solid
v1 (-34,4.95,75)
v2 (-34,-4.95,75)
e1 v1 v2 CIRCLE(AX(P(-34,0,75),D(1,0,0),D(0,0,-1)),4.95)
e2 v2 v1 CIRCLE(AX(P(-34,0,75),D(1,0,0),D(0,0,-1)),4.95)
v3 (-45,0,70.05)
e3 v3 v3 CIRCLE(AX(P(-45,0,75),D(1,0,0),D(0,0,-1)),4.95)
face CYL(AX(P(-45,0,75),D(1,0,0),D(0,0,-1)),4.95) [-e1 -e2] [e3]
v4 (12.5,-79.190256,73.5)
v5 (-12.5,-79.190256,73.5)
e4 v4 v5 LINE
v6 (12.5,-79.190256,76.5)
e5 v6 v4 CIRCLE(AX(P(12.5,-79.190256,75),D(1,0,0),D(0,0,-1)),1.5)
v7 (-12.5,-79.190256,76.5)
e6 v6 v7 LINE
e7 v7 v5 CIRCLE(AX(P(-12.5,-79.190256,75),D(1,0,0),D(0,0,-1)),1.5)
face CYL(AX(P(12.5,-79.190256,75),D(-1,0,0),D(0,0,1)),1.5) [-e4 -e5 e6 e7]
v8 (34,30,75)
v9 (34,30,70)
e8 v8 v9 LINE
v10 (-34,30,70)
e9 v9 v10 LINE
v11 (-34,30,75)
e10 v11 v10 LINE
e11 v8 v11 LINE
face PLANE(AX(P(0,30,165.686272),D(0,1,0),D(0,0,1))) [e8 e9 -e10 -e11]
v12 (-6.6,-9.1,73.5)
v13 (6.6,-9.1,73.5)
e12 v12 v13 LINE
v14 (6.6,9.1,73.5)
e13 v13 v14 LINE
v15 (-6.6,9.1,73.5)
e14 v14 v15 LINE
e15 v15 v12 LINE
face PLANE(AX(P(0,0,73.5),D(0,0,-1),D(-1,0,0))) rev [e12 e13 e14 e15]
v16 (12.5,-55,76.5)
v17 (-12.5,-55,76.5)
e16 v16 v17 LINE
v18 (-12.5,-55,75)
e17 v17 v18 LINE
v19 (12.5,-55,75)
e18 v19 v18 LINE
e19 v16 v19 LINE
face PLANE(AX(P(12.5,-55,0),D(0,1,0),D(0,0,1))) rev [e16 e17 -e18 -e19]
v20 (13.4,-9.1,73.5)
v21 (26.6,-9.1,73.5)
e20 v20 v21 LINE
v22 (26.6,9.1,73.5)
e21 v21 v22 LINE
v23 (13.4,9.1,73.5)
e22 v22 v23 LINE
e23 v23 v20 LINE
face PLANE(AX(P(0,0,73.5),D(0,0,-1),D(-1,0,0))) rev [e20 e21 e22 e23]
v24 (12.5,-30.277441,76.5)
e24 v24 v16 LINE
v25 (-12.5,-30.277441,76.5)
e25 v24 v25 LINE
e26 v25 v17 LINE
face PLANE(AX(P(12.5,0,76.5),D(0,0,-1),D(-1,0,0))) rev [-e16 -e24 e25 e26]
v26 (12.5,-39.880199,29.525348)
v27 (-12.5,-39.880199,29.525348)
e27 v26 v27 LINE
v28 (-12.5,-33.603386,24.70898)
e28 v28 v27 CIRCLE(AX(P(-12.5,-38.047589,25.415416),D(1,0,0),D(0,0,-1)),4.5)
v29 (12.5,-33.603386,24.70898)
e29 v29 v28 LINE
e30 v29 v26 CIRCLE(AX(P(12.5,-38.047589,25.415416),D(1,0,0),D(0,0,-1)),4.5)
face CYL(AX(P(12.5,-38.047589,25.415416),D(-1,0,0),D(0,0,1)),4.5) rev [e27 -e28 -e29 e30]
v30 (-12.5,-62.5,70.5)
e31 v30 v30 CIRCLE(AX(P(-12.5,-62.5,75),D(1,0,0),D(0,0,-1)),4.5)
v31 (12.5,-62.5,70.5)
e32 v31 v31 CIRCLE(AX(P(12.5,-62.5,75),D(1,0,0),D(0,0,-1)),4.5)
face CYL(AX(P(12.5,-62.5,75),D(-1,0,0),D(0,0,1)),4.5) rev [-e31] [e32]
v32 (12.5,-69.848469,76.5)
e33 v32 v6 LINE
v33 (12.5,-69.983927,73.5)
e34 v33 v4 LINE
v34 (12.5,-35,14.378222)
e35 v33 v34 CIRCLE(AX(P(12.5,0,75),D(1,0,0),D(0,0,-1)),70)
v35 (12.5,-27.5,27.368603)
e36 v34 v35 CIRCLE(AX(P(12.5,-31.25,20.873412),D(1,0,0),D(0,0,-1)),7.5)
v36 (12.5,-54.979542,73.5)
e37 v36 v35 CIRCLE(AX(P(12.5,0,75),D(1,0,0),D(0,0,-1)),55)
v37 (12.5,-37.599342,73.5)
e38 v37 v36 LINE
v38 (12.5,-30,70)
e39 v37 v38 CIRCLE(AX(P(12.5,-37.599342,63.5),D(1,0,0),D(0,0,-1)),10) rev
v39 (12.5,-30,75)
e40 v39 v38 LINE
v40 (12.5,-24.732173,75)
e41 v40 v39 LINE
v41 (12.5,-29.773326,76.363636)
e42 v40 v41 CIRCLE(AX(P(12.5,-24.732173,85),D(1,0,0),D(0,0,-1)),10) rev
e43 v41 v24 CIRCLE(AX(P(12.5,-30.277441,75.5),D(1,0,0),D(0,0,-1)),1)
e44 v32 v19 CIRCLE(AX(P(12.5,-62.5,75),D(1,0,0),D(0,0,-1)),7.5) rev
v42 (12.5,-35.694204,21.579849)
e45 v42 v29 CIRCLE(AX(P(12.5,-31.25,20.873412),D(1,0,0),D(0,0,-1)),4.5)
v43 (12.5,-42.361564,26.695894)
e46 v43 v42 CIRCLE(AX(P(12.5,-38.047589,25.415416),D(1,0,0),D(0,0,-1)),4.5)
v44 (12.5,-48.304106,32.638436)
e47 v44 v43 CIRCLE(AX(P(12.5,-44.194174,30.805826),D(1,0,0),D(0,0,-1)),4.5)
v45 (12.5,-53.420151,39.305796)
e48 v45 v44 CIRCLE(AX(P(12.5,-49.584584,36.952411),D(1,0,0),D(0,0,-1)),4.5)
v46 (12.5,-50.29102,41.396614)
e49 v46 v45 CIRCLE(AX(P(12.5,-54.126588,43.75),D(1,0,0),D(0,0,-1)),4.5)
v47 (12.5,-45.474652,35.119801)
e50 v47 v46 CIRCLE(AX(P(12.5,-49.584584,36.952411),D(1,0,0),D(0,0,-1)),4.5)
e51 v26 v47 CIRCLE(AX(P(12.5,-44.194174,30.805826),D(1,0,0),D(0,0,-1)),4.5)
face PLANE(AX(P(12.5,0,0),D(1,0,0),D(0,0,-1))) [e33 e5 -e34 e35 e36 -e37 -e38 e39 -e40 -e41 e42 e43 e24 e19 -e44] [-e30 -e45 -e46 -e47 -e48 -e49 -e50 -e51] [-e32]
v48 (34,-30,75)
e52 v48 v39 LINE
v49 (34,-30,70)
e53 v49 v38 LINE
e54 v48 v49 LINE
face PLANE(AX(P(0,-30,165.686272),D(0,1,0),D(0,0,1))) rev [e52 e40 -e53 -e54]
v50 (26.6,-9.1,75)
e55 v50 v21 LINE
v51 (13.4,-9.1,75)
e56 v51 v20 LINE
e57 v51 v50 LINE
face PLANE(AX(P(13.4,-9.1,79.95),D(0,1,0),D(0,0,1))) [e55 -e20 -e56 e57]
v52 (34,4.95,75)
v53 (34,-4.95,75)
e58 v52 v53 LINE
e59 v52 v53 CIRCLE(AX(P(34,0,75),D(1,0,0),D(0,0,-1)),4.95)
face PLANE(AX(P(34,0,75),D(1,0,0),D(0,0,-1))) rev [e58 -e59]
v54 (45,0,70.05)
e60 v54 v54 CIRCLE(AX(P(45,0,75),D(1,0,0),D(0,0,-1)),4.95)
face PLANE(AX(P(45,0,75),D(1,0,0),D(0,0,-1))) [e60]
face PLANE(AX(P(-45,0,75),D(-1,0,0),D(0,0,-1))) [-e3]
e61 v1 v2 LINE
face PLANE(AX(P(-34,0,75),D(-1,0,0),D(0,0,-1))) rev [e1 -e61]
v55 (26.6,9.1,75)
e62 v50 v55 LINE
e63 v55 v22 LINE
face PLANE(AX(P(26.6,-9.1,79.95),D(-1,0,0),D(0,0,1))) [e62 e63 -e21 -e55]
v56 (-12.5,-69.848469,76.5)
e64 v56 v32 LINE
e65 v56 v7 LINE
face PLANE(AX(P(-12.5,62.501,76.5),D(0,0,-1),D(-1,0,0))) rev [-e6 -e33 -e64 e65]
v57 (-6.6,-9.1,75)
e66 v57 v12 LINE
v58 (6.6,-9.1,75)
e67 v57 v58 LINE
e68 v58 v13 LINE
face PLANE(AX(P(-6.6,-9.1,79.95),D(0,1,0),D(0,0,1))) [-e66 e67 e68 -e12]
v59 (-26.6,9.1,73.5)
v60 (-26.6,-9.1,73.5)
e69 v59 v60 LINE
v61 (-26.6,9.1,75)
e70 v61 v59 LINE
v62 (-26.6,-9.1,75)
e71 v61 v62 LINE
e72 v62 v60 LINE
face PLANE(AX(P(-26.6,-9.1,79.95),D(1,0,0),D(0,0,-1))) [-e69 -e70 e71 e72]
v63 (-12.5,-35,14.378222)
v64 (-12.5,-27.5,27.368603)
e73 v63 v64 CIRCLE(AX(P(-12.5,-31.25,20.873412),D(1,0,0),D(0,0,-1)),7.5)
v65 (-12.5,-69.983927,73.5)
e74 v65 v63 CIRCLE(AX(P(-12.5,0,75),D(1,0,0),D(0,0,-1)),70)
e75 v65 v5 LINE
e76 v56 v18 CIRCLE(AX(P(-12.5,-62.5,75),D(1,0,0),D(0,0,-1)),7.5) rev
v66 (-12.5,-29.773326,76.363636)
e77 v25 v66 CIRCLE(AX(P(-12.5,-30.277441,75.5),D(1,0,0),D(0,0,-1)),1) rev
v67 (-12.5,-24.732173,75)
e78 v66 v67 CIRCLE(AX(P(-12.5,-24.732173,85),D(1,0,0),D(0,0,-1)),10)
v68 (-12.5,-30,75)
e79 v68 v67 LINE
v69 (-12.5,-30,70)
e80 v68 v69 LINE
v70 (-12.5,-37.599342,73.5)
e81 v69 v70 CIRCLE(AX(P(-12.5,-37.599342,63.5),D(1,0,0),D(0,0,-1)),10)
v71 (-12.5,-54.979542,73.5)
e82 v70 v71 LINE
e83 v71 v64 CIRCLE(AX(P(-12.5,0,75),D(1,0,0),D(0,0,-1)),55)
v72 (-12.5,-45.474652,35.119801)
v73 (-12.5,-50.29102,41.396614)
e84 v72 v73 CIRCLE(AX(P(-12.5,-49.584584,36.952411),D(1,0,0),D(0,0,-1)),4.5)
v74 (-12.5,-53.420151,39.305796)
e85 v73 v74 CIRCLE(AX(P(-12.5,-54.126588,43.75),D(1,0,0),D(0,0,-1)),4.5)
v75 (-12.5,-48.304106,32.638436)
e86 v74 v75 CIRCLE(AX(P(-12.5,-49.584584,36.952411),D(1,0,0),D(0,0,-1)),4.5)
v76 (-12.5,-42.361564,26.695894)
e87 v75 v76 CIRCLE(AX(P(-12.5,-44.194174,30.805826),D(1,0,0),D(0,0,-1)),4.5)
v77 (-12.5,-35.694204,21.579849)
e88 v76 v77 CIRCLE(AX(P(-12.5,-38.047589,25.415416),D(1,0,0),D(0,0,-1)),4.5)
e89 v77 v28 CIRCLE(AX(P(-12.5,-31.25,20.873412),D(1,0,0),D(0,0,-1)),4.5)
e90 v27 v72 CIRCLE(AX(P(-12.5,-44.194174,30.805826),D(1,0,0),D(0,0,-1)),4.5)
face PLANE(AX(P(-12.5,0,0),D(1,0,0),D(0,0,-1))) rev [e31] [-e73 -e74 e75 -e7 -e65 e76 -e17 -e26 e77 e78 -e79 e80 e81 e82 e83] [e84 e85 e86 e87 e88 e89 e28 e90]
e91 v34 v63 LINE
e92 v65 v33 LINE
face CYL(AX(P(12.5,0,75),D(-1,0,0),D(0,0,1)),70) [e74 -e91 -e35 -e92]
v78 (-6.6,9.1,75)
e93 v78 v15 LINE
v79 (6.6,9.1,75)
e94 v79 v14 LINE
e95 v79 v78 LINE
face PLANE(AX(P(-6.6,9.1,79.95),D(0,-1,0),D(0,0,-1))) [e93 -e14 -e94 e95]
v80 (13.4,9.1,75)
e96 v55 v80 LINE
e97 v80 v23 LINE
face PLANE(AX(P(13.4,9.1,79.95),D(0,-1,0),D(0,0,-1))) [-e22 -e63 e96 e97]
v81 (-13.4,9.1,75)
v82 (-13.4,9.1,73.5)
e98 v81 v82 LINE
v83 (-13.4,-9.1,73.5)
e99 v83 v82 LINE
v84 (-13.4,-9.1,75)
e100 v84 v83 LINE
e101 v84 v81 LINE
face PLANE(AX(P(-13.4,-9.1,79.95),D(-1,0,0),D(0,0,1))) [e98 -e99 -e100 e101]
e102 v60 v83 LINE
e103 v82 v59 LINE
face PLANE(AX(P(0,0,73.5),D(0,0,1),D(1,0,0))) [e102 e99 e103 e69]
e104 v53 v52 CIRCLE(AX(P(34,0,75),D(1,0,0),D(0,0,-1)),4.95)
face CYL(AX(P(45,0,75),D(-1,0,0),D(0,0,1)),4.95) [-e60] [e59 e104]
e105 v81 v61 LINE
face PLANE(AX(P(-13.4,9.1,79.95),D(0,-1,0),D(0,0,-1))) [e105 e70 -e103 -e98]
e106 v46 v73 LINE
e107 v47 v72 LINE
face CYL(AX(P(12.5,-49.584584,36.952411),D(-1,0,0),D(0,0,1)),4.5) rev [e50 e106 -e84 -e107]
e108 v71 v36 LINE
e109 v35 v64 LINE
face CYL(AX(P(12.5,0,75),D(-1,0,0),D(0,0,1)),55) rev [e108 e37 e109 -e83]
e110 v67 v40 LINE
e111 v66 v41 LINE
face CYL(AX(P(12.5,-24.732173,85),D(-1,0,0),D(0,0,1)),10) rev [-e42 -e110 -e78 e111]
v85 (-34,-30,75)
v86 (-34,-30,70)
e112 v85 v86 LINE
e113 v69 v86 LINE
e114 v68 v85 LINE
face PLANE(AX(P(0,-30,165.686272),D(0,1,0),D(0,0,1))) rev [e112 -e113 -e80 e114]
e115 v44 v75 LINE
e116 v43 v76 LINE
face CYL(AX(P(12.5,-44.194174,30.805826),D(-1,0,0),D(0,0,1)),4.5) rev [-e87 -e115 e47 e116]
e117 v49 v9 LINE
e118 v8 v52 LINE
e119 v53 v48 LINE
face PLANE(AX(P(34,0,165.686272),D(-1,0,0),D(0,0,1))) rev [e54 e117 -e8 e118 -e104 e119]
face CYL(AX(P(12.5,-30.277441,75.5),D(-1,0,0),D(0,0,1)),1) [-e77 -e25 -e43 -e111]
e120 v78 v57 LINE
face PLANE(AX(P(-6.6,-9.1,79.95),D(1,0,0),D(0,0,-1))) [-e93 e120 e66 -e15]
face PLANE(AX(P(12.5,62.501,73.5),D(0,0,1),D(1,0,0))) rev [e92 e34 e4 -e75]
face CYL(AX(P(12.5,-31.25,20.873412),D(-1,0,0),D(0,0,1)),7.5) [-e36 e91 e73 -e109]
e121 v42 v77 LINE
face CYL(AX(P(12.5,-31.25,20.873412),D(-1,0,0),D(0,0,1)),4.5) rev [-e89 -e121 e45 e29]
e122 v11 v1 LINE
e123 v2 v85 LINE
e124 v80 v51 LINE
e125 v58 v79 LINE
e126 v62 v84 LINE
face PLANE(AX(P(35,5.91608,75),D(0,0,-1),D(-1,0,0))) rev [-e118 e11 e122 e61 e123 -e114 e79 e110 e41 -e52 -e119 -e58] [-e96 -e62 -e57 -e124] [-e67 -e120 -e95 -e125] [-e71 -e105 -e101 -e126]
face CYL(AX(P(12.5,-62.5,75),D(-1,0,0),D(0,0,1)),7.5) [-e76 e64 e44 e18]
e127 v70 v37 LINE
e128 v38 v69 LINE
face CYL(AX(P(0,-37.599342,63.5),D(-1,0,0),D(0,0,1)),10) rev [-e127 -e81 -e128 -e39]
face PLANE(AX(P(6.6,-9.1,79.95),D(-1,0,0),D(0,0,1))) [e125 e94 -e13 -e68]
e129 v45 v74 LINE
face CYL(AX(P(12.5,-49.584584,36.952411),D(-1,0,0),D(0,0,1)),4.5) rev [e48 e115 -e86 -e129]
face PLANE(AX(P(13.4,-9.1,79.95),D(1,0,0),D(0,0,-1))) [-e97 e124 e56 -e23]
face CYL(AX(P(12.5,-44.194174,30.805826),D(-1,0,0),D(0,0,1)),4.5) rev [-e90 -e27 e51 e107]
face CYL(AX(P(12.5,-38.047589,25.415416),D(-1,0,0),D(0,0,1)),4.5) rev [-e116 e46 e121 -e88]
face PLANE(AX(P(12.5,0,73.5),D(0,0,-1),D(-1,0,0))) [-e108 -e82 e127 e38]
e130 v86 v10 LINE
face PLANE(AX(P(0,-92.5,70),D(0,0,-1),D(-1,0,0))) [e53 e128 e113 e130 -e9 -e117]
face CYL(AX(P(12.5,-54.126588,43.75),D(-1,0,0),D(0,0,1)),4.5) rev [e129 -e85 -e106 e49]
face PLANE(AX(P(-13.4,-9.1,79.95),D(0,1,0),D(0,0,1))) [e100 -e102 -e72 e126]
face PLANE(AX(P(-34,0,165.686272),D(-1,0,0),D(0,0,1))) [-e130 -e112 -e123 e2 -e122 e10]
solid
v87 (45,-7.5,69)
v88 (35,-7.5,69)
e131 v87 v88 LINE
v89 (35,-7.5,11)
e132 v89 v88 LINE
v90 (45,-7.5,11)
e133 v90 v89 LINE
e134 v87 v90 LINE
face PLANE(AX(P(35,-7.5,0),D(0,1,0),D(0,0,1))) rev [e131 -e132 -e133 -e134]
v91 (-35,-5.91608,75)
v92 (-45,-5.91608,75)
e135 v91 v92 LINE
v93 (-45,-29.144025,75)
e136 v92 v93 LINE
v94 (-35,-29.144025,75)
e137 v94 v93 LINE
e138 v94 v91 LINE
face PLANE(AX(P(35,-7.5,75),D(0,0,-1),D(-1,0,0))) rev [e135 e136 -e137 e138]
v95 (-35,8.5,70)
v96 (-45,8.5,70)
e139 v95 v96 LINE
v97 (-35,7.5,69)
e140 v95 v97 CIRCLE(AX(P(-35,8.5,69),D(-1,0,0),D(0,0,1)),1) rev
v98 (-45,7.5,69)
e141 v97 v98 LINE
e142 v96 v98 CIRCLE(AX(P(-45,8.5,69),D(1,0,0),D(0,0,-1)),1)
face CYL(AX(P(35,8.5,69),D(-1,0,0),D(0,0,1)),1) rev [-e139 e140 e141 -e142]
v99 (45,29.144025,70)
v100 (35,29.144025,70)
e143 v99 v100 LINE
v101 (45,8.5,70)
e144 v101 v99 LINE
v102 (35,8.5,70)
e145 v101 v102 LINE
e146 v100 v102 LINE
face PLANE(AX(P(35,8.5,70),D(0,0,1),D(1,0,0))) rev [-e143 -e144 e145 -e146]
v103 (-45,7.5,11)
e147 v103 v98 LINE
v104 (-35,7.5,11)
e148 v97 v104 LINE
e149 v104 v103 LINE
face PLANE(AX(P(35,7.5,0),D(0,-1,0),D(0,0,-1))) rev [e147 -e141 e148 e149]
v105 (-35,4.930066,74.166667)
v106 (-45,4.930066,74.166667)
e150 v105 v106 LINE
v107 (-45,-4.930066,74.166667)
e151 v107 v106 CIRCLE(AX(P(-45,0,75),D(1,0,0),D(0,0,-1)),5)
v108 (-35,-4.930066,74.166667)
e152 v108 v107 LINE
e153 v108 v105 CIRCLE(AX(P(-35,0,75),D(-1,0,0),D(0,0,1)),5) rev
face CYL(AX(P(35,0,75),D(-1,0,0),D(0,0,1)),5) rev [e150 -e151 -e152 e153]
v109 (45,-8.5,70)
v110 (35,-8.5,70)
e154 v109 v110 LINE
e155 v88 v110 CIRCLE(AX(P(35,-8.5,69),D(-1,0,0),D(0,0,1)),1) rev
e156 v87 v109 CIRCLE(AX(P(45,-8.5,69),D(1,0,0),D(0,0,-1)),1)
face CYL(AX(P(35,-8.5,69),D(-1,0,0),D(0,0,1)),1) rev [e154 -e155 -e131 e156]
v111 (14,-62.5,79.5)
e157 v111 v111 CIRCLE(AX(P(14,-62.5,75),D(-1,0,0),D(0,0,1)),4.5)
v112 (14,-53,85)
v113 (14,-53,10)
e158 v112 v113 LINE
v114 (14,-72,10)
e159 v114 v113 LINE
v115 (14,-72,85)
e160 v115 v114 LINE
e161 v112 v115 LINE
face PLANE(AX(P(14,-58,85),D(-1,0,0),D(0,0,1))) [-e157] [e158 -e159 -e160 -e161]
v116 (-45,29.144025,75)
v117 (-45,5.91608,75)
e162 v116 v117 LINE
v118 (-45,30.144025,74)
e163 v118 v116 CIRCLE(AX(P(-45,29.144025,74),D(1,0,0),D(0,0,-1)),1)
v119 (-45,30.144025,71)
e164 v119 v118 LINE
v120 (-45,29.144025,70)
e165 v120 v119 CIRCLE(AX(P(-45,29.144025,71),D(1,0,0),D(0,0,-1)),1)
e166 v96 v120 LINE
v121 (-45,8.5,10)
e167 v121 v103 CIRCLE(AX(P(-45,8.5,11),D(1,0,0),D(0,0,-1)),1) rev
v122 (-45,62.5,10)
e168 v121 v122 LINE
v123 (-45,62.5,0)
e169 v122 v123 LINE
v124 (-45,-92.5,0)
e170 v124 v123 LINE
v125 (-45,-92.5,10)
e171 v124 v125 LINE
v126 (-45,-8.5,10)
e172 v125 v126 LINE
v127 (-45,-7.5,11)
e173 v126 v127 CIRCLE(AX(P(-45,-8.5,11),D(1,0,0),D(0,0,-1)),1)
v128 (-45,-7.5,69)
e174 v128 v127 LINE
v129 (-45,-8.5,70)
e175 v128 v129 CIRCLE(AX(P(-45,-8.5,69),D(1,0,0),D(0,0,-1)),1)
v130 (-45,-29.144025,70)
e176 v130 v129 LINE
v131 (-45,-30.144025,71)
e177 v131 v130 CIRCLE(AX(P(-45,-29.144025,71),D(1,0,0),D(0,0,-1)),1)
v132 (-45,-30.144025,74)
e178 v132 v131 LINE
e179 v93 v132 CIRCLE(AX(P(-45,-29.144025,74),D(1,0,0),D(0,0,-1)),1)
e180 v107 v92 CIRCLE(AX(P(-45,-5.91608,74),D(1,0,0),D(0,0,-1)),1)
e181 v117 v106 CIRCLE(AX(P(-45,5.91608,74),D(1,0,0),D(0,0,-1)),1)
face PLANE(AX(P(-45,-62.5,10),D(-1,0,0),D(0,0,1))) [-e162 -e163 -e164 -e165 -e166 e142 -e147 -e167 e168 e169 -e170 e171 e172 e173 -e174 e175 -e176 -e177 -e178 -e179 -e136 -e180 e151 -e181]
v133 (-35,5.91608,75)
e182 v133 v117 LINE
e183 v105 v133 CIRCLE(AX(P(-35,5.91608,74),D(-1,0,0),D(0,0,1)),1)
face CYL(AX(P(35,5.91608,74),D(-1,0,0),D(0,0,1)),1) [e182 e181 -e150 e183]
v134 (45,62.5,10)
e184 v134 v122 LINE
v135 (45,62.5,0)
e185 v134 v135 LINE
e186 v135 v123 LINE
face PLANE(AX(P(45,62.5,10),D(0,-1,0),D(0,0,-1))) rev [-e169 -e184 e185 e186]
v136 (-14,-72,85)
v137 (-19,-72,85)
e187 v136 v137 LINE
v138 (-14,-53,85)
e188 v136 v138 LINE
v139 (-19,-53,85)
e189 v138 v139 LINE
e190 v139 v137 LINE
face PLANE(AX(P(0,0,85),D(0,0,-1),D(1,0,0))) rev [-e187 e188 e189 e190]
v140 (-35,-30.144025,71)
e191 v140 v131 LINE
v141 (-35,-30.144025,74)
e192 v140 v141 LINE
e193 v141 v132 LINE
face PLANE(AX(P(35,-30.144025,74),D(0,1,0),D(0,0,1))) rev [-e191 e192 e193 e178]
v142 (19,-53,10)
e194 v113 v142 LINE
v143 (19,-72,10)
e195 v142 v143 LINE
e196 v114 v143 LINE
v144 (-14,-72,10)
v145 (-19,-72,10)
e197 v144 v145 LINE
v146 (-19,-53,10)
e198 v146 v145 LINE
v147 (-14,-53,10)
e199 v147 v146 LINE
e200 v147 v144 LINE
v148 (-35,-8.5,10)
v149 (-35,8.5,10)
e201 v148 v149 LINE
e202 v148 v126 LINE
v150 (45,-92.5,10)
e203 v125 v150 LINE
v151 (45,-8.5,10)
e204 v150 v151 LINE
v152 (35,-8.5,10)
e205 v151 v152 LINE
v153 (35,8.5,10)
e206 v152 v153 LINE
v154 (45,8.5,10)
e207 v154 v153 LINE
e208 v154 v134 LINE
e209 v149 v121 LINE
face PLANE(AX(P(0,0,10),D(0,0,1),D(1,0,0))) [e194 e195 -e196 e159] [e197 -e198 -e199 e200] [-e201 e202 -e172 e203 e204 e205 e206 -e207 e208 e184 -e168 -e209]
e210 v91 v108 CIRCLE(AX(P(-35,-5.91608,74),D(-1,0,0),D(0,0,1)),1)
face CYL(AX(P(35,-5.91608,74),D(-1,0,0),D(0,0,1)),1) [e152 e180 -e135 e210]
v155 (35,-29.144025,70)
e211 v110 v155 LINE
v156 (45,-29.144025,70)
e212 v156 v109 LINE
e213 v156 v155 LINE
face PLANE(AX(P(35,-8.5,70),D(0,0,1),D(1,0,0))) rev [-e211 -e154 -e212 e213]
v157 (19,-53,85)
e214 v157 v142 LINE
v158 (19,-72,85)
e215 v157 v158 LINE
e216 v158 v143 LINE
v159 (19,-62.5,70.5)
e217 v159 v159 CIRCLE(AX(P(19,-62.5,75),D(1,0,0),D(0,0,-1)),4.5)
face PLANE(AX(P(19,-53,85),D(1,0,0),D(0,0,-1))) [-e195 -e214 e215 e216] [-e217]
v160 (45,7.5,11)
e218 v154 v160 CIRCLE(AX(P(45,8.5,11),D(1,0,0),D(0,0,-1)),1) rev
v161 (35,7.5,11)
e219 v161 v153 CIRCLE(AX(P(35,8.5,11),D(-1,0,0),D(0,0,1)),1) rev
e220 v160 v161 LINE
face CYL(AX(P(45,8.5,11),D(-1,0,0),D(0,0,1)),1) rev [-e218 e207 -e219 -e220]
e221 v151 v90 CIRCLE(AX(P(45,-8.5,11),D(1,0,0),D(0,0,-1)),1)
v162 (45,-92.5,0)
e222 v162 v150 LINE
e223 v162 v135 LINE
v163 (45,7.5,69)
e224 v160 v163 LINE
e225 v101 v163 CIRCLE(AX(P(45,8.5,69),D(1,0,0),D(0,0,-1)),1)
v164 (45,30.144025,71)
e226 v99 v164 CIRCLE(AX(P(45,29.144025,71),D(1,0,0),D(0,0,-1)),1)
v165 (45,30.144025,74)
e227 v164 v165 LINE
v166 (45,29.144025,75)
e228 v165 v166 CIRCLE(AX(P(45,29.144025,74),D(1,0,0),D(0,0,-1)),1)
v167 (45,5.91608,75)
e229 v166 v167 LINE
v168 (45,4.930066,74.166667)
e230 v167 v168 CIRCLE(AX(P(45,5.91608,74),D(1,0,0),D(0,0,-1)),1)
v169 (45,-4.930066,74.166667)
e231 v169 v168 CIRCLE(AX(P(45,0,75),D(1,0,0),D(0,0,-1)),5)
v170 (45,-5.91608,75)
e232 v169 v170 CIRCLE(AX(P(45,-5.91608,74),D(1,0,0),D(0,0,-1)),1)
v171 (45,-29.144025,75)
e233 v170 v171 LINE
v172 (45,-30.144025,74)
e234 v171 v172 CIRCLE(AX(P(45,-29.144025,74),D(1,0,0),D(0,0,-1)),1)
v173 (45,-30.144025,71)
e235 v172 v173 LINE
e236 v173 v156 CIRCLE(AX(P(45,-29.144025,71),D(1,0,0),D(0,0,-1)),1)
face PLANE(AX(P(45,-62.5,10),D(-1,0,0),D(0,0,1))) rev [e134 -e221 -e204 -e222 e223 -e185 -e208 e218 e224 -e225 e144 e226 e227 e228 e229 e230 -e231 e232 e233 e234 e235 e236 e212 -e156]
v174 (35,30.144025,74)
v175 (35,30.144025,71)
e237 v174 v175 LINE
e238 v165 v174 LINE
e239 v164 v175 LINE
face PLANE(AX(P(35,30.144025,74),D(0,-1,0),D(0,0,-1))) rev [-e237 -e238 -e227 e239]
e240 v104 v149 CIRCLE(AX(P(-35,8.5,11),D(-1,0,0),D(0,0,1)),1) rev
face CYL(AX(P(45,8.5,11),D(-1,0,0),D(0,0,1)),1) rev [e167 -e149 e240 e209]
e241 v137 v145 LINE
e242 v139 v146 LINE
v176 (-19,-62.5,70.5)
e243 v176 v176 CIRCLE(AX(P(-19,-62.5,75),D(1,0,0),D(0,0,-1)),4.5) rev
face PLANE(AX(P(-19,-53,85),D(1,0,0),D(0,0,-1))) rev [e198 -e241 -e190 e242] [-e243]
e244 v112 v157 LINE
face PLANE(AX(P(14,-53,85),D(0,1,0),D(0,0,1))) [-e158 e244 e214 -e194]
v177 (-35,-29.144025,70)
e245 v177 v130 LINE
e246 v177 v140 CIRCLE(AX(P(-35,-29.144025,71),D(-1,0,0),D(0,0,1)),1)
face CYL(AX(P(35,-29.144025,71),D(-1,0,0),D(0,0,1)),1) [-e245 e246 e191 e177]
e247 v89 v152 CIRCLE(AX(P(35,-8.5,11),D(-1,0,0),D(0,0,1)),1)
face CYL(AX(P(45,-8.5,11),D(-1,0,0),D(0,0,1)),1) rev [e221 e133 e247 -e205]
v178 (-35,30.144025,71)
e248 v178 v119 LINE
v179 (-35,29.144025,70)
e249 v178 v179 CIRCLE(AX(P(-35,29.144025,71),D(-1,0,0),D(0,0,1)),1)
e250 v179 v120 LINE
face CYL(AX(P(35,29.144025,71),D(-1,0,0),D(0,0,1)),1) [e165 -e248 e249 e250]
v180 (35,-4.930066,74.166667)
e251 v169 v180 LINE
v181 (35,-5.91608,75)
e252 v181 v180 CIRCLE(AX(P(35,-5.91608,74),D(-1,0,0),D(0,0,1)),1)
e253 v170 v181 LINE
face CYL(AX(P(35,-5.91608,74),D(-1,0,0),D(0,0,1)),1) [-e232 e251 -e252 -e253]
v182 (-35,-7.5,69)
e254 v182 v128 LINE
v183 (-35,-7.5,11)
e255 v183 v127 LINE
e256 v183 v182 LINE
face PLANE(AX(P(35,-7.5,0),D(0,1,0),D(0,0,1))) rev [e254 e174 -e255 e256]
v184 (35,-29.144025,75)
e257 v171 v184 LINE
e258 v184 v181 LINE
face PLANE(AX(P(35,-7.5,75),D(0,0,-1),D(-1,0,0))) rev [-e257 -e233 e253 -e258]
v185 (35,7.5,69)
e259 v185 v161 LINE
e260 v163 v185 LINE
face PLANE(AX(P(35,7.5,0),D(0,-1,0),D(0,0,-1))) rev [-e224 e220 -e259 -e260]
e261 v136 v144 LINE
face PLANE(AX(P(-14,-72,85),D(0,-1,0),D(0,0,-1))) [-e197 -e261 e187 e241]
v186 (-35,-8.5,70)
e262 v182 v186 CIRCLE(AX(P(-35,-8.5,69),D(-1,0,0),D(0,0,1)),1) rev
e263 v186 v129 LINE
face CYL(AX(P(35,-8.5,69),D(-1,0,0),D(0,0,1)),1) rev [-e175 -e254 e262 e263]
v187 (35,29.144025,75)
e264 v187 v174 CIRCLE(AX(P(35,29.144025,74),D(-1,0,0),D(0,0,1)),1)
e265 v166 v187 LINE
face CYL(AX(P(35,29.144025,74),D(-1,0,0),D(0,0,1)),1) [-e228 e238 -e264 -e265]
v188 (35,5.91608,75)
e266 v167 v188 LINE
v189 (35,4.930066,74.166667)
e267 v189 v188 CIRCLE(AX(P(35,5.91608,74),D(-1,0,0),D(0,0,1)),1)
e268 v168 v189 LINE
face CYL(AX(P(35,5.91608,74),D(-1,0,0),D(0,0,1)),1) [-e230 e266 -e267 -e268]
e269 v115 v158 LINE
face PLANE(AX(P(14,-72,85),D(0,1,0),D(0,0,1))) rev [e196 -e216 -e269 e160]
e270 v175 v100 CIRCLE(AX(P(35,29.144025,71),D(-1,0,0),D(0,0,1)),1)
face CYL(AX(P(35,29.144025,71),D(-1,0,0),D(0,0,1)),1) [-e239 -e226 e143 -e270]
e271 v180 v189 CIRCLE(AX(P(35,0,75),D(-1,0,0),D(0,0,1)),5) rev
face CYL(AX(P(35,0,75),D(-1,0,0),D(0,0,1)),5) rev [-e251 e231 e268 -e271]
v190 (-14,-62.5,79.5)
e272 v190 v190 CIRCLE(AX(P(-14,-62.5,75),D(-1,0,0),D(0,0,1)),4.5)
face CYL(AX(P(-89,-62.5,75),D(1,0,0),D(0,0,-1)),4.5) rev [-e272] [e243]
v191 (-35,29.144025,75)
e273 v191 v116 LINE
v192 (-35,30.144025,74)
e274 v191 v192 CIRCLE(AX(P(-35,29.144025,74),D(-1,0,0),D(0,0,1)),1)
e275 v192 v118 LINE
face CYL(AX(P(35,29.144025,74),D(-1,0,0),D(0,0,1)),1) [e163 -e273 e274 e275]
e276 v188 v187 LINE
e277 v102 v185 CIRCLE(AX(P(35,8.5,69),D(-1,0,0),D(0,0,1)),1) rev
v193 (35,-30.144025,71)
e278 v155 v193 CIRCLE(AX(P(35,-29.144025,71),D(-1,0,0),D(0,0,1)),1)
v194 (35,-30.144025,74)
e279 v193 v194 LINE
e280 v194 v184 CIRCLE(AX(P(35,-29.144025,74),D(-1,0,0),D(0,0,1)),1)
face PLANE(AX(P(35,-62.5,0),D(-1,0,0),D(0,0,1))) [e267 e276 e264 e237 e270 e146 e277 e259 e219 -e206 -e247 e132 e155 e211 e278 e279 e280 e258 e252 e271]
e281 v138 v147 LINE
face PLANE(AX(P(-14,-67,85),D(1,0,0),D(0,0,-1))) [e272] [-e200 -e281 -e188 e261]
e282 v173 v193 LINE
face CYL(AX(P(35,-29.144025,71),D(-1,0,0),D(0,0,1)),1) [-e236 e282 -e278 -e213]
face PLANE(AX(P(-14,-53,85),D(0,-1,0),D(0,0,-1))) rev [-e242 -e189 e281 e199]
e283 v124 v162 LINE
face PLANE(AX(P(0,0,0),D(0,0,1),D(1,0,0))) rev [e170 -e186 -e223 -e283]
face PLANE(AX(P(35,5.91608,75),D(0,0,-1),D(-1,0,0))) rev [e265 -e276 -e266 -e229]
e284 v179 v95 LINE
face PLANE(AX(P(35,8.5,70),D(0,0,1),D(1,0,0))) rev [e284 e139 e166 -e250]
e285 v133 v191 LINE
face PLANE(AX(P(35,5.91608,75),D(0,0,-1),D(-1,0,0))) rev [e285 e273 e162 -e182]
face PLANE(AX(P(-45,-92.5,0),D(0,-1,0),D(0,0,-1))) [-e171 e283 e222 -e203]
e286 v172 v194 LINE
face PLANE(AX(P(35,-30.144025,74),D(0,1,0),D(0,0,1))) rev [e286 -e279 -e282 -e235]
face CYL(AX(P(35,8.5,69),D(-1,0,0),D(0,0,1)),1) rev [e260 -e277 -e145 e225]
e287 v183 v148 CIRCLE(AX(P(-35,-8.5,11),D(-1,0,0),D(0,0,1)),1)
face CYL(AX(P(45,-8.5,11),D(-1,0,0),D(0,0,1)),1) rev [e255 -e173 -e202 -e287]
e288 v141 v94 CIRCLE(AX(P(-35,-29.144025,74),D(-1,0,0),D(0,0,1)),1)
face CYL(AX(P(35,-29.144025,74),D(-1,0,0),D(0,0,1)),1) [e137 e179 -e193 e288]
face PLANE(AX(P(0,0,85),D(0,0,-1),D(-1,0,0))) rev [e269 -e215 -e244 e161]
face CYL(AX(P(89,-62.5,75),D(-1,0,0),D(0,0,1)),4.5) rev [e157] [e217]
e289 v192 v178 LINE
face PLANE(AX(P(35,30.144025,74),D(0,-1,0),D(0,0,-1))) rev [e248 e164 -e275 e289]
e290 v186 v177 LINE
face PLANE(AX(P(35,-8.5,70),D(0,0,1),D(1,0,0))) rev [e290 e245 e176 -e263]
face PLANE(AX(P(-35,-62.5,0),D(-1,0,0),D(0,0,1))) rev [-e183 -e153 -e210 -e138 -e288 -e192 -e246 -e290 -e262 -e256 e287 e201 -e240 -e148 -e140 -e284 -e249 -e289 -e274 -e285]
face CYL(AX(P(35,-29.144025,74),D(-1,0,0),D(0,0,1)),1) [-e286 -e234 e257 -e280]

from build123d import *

# Parameters (mm, degrees)
SKETCH1_W               = 125.00000000000001
SKETCH1_H               = 90
BOSS_EXTRUDE1_DEPTH     = 10
BOSS_EXTRUDE2_DEPTH     = 35
BOSS_EXTRUDE3_DEPTH     = 45
CUT_EXTRUDE3_DEPTH      = 113.0267825120404
CUT_EXTRUDE3_DEPTH_BACK = 113.0267825120404
SKETCH11_W              = 89.99999999999999
SKETCH11_H              = 29.999999999999993
BOSS_EXTRUDE5_DEPTH     = 10
SKETCH13_W              = 68
SKETCH13_H              = 60.00000000000001
BOSS_EXTRUDE6_DEPTH     = 65
CUT_EXTRUDE6_DEPTH      = 151.5199322349037
CUT_EXTRUDE6_DEPTH_BACK = 151.5199322349037
SKETCH14_W              = 68
SKETCH14_H              = 59.999999999999986
SKETCH15_R              = 4.9499999999999975
BOSS_EXTRUDE8_DEPTH     = 11
CUT_EXTRUDE7_DEPTH      = 128.30377056474015
CUT_EXTRUDE7_DEPTH_BACK = 1.5
SKETCH17_W              = 13.199999999999998
SKETCH17_H              = 18.2
SKETCH19_R              = 4.499999999999999
BOSS_EXTRUDE10_DEPTH    = 12.5
BOSS_EXTRUDE12_DEPTH    = 12.5
BOSS_EXTRUDE13_DEPTH    = 75
SKETCH22_R              = 4.500000000000005
CUT_EXTRUDE8_DEPTH      = 75
FILLET1_R               = 10
FILLET5_R               = 1
BOSS_EXTRUDE14_DEPTH    = 12.5
BOSS_EXTRUDE16_REACH    = 167.349
SKETCH24_W              = 25.000000000000004
SKETCH24_H              = 3.000000000000014


with BuildPart() as part:
    # Sketch1 → Boss-Extrude1 (new body)
    with BuildSketch(Plane(origin=(0, 0, 0), x_dir=(0, 1, 0), z_dir=(0, 0, 1))):
        Rectangle(SKETCH1_W, SKETCH1_H)
    extrude(amount=BOSS_EXTRUDE1_DEPTH)

    # Sketch3 → Boss-Extrude2 (add, symmetric)
    with BuildSketch(Plane.YZ):
        with BuildLine():
            Line((5.916079783099619, 75), (7.5, 75))
            Line((7.5, 75), (29.144025452034434, 75))
            ThreePointArc((29.144025452034434, 75), (29.851132233220987, 74.70710678118655), (30.14402545203444, 74))
            Line((30.14402545203444, 74), (30.14402545203444, 71))
            ThreePointArc((30.14402545203444, 71), (29.851132233220998, 70.29289321881345), (29.144025452034434, 69.99999999999999))
            Line((29.144025452034434, 69.99999999999999), (8.500000000000007, 69.99999999999999))
            ThreePointArc((8.500000000000007, 69.99999999999999), (7.792893218813454, 69.70710678118654), (7.5, 68.99999999999999))
            Line((7.5, 68.99999999999999), (7.5, 0))
            Line((7.5, 0), (-7.5, 0))
            Line((-7.5, 0), (-7.5, 68.99999999999999))
            ThreePointArc((-7.5, 68.99999999999999), (-7.792893218813454, 69.70710678118654), (-8.500000000000007, 69.99999999999999))
            Line((-8.500000000000007, 69.99999999999999), (-29.144025452034434, 69.99999999999999))
            ThreePointArc((-29.144025452034434, 69.99999999999999), (-29.851132233220994, 70.29289321881345), (-30.14402545203444, 71))
            Line((-30.14402545203444, 71), (-30.14402545203444, 74))
            ThreePointArc((-30.14402545203444, 74), (-29.851132233220987, 74.70710678118655), (-29.144025452034434, 75))
            Line((-29.144025452034434, 75), (-7.5, 75))
            Line((-7.5, 75), (-5.916079783099619, 75))
            ThreePointArc((-5.916079783099619, 75), (-5.2705825587317126, 74.76376261582597), (-4.930066485916348, 74.16666666666666))
            ThreePointArc((-4.930066485916348, 74.16666666666666), (3.1e-16, 70), (4.930066485916348, 74.16666666666666))
            ThreePointArc((4.930066485916348, 74.16666666666666), (5.2705825587317126, 74.76376261582597), (5.916079783099619, 75))
        make_face()
    extrude(amount=BOSS_EXTRUDE2_DEPTH, both=True)

    # Sketch5 → Boss-Extrude3 (add, symmetric)
    with BuildSketch(Plane.YZ):
        with BuildLine():
            ThreePointArc((-7.5, 68.99999999999999), (-7.792893218813455, 69.70710678118654), (-8.500000000000007, 69.99999999999999))
            Line((-8.500000000000007, 69.99999999999999), (-29.144025452034434, 69.99999999999999))
            ThreePointArc((-29.144025452034434, 69.99999999999999), (-29.851132233220987, 70.29289321881345), (-30.14402545203444, 71))
            Line((-30.14402545203444, 71), (-30.14402545203444, 74))
            ThreePointArc((-30.14402545203444, 74), (-29.851132233220987, 74.70710678118655), (-29.14402545203444, 75))
            Line((-29.14402545203444, 75), (-5.916079783099619, 75))
            ThreePointArc((-5.916079783099619, 75), (-5.2705825587317126, 74.76376261582597), (-4.930066485916349, 74.16666666666666))
            ThreePointArc((-4.930066485916349, 74.16666666666666), (3.1e-16, 70), (4.930066485916347, 74.16666666666666))
            ThreePointArc((4.930066485916347, 74.16666666666666), (5.2705825587317126, 74.76376261582597), (5.916079783099619, 75))
            Line((5.916079783099619, 75), (29.144025452034434, 75))
            ThreePointArc((29.144025452034434, 75), (29.851132233220987, 74.70710678118655), (30.14402545203444, 74))
            Line((30.14402545203444, 74), (30.14402545203444, 71))
            ThreePointArc((30.14402545203444, 71), (29.851132233220998, 70.29289321881345), (29.144025452034434, 69.99999999999999))
            Line((29.144025452034434, 69.99999999999999), (8.500000000000007, 69.99999999999999))
            ThreePointArc((8.500000000000007, 69.99999999999999), (7.792893218813454, 69.70710678118654), (7.499999999999999, 68.99999999999999))
            Line((7.499999999999999, 68.99999999999999), (7.5, 11.000000000000009))
            ThreePointArc((7.5, 11.000000000000009), (7.79289321881345, 10.292893218813452), (8.500000000000007, 10))
            Line((8.500000000000007, 10), (-8.500000000000007, 10))
            ThreePointArc((-8.500000000000007, 10), (-7.79289321881345, 10.292893218813452), (-7.5, 11.000000000000009))
            Line((-7.5, 11.000000000000009), (-7.5, 68.99999999999999))
        make_face()
    extrude(amount=BOSS_EXTRUDE3_DEPTH, both=True)

    # Sketch7 → Cut-Extrude3 (cut, two sides: drawn at the far end of the back side and taken through both)
    with BuildSketch(Plane(origin=(0, 7.5, 0), x_dir=(-1, 0, 0), z_dir=(0, 1, 0)).offset(-CUT_EXTRUDE3_DEPTH_BACK)):
        Polygon((-35.000000000000014, 11.000000000000009), (-1.421e-14, 11.000000000000009), (-1.388e-14, 68.99999999999999), (-35, 68.99999999999999), align=None)
        Polygon((-1.388e-14, 68.99999999999999), (-1.388e-14, 11.000000000000009), (35, 11.000000000000009), (34.99999999999999, 68.99999999999999), align=None)
        Polygon((-35.000000000000014, 10.000000000000002), (-1.421e-14, 10.000000000000002), (-1.388e-14, 11.000000000000009), (-35.000000000000014, 11.000000000000009), align=None)
        Polygon((-1.388e-14, 11.000000000000009), (-1.388e-14, 10), (34.999999999999986, 10.000000000000002), (34.99999999999999, 11.000000000000009), align=None)
        Polygon((-35, 68.99999999999999), (-1.421e-14, 68.99999999999999), (-1.388e-14, 75), (-35, 75), align=None)
        Polygon((-1.388e-14, 75), (-1.388e-14, 68.99999999999999), (34.99999999999999, 68.99999999999999), (34.99999999999999, 75.00000000000001), align=None)
    extrude(amount=CUT_EXTRUDE3_DEPTH + CUT_EXTRUDE3_DEPTH_BACK, mode=Mode.SUBTRACT)

    # Sketch11 → Boss-Extrude5 (add)
    with BuildSketch(Plane.XY.offset(10)):
        with Locations((-7.11e-15, -77.5)):
            Rectangle(SKETCH11_W, SKETCH11_H)
    extrude(amount=-BOSS_EXTRUDE5_DEPTH)

    # Sketch13 → Boss-Extrude6 (add)
    with BuildSketch(Plane.XY.offset(10)):
        Rectangle(SKETCH13_W, SKETCH13_H)
    extrude(amount=BOSS_EXTRUDE6_DEPTH)

    # Sketch14 → Cut-Extrude6 (cut, two sides: drawn at the far end of the back side and taken through both)
    with BuildSketch(Plane(origin=(0, 30, 0), x_dir=(-1, 0, 0), z_dir=(0, 1, 0)).offset(-CUT_EXTRUDE6_DEPTH_BACK)):
        with Locations((0, 39.99999999999999)):
            Rectangle(SKETCH14_W, SKETCH14_H)
    extrude(amount=CUT_EXTRUDE6_DEPTH + CUT_EXTRUDE6_DEPTH_BACK, mode=Mode.SUBTRACT)


with BuildPart() as cut_extrude6_piece_1:
    # of the separate pieces the step leaves, piece 1, a body of its own (cut_extrude6_pieces)
    add(part.part.solids().sort_by_distance((45, -8.5, 10))[0])

    # Sketch21 → Boss-Extrude13 (add)
    with BuildSketch(Plane.XY.offset(10)):
        Polygon((14, -67), (14, -58), (14, -53.00000000000001), (19, -53.00000000000001), (19, -72.00000000000001), (14, -72.00000000000001), align=None)
    boss_extrude13 = extrude(amount=BOSS_EXTRUDE13_DEPTH)

    # Sketch22 → Cut-Extrude8 (cut)
    with BuildSketch(Plane(origin=(14, 0, 0), x_dir=(0, -1, 0), z_dir=(-1, 0, 0))):
        with Locations(Location((62.5, 75, 0), (0, 0, 90))):
            Circle(SKETCH22_R)
    cut_extrude8 = extrude(amount=-CUT_EXTRUDE8_DEPTH, mode=Mode.SUBTRACT)

    # Mirror3: Boss-Extrude13, Cut-Extrude8 across plane
    add(boss_extrude13.mirror(Plane(origin=(0, 0, 0), x_dir=(0, 0, 1), z_dir=(1, 0, 0))))
    add(cut_extrude8.mirror(Plane(origin=(0, 0, 0), x_dir=(0, 0, 1), z_dir=(1, 0, 0))), mode=Mode.SUBTRACT)


with BuildPart() as cut_extrude6_piece_2:
    # of the separate pieces the step leaves, piece 2, a body of its own (cut_extrude6_pieces)
    add(part.part.solids().sort_by_distance((34, 30, 70))[0])

    # Sketch15 → Boss-Extrude8 (add)
    with BuildSketch(Plane.YZ.offset(34)):
        with Locations(Location((0, 75, 0), (0, 0, 180))):
            Circle(SKETCH15_R)
    boss_extrude8 = extrude(amount=BOSS_EXTRUDE8_DEPTH)

    # Mirror2: Boss-Extrude8 across plane
    add(boss_extrude8.mirror(Plane(origin=(0, 0, 0), x_dir=(0, 0, 1), z_dir=(1, 0, 0))))

    # Sketch17 → Cut-Extrude7 (cut, two sides: drawn at the far end of the back side and taken through both)
    with BuildSketch(Plane.XY.offset(75).offset(-CUT_EXTRUDE7_DEPTH_BACK)):
        with Locations((20, 0)):
            Rectangle(SKETCH17_W, SKETCH17_H)
        Rectangle(SKETCH17_W, SKETCH17_H)
        with Locations((-20, 0)):
            Rectangle(SKETCH17_W, SKETCH17_H)
    extrude(amount=CUT_EXTRUDE7_DEPTH + CUT_EXTRUDE7_DEPTH_BACK, mode=Mode.SUBTRACT)



with BuildPart() as body_3:
    # Sketch19 → Boss-Extrude10 (new, symmetric)
    with BuildSketch(Plane.YZ):
        with BuildLine():
            ThreePointArc((-27.500000000000195, 27.368602791855984), (-47.63139720814418, 47.5000000000001), (-54.999999999999986, 75))
            ThreePointArc((-54.99999999999999, 75), (-62.500000000000234, 82.5), (-70, 74.99999999999952))
            ThreePointArc((-70.00000000000001, 74.99999999999952), (-60.62177826491066, 39.999999999999915), (-35.00000000000025, 14.378221735089447))
            ThreePointArc((-35.00000000000025, 14.378221735089461), (-24.75480947161695, 17.1234122634727), (-27.5000000000002, 27.368602791855995))
        make_face()
        with BuildLine():
            ThreePointArc((-53.420151070749036, 39.305796220104114), (-57.549230355616196, 46.67156079895663), (-49.62658773652759, 43.75000000000031))
            ThreePointArc((-49.62658773652759, 43.75000000000031), (-49.79588035427119, 42.52730888231364), (-50.29102043398087, 41.396614466851425))
            ThreePointArc((-50.291020433980876, 41.39661446685144), (-46.66302296924606, 40.37505330604382), (-45.08458376820239, 36.95241068695523))
            ThreePointArc((-45.08458376820239, 36.95241068695523), (-45.18318093770394, 36.01557925938665), (-45.47465182317137, 35.11980068828845))
            ThreePointArc((-45.47465182317139, 35.119800688288485), (-41.50271984866162, 34.41221987284317), (-39.69417382415946, 30.805826175841016))
            ThreePointArc((-39.69417382415946, 30.805826175841016), (-39.740923028054816, 30.158866094388294), (-39.88019931171205, 29.5253481768289))
            ThreePointArc((-39.88019931171212, 29.52534817682898), (-35.59776738012861, 29.19011787523953), (-33.547589313045286, 25.415416231797977))
            ThreePointArc((-33.547589313045286, 25.415416231797977), (-33.56156005491885, 25.06109787885311), (-33.603385533149094, 24.708979566019387))
            ThreePointArc((-33.603385533149144, 24.70897956601943), (-29.052300623284896, 24.80025800141369), (-26.75000000000022, 20.87341226347273))
            ThreePointArc((-26.75000000000022, 20.87341226347273), (-31.604318352945057, 16.387383005346287), (-35.69420377989643, 21.579848929251266))
            ThreePointArc((-35.694203779896405, 21.579848929251252), (-40.787015743584554, 21.845326200487442), (-42.36156382549272, 26.695894230810016))
            ThreePointArc((-42.36156382549269, 26.695894230809987), (-47.37615433949895, 27.62384566050158), (-48.304105769190464, 32.63843617450786))
            ThreePointArc((-48.304105769190386, 32.63843617450779), (-53.154673799512956, 34.21298425641601), (-53.420151070749085, 39.30579622010416))
        make_face(mode=Mode.SUBTRACT)
        with Locations(Location((-62.5, 75, 0), (0, 0, 270))):
            Circle(SKETCH19_R, mode=Mode.SUBTRACT)
    extrude(amount=BOSS_EXTRUDE10_DEPTH, both=True)


with BuildPart() as cut_extrude6_piece_2_1:
    add(cut_extrude6_piece_2.part)

    add(body_3.part)  # Boss-Extrude12 merges body 3
    # Sketch20 → Boss-Extrude12 (add, symmetric)
    with BuildSketch(Plane.YZ):
        Polygon((-55.000000000000014, 74.9999999999996), (-30, 75), (-30, 76.49999999999999), (-55.000000000000014, 76.49999999999999), align=None)
        Polygon((-30, 73.49999999999999), (-30, 75), (-55.000000000000014, 74.9999999999996), (-55.000000000000014, 73.49999999999999), align=None)
    extrude(amount=BOSS_EXTRUDE12_DEPTH, both=True)

    # Fillet1
    # the kernel refuses this fillet: 10 mm, written as the material it adds along each edge
    with BuildSketch(Plane(origin=(-12.5, -30, 75), x_dir=(0, 1, 0), z_dir=(1, 0, 0))) as fillet1_piece_1:
        with BuildLine():
            CenterArc((5.267826876426348, 10), FILLET1_R, 238.21166938294851, 31.788330617051486)
            Line((0, 1.4999999999999858), (0, 0))
            Line((0, 0), (5.267826876426348, 0))
        make_face()
    extrude(amount=25)
    with BuildSketch(Plane(origin=(12.5, -30, 73.49999999999999), x_dir=(0, 0, -1), z_dir=(-1, 0, 0))) as fillet1_piece_2:
        with BuildLine():
            CenterArc((10, 7.599342076785334), FILLET1_R, 180, 49.45839812649547)
            Line((0, 7.599342076785334), (0, 0))
            Line((0, 0), (3.5, 0))
        make_face()
    extrude(amount=25)

    # Fillet5
    fillet5_edges = [cut_extrude6_piece_2_1.edges().sort_by_distance(p)[0] for p in [
        (0, -30, 76.49999999999999),
    ]]
    fillet(fillet5_edges, radius=FILLET5_R)

    # Sketch24 → Boss-Extrude16 (add, up to next)
    with BuildSketch(Plane(origin=(0, -72.00000000000001, 0), x_dir=(-1, 0, 0), z_dir=(0, 1, 0)), mode=Mode.PRIVATE) as boss_extrude16_sk1:
        with Locations((0, 74.99999999999997)):
            Rectangle(SKETCH24_W, SKETCH24_H)
    boss_extrude16_tool1 = extrude(boss_extrude16_sk1.sketch, amount=BOSS_EXTRUDE16_REACH, mode=Mode.PRIVATE) - cut_extrude6_piece_2_1.part


with BuildPart() as body_3_2:
    # Sketch23 → Boss-Extrude14 (new, symmetric)
    with BuildSketch(Plane.YZ):
        with BuildLine():
            Line((-72.00000000000001, 76.49999999999999), (-79.19025615629191, 76.49999999999999))
            ThreePointArc((-79.19025615629191, 76.49999999999999), (-80.69025615629191, 74.99999999999999), (-79.19025615629191, 73.49999999999997))
            Line((-79.19025615629191, 73.49999999999997), (-72.00000000000001, 73.49999999999997))
            Line((-72.00000000000001, 73.49999999999997), (-72.00000000000001, 76.49999999999999))
        make_face()
    extrude(amount=BOSS_EXTRUDE14_DEPTH, both=True)


with BuildPart() as cut_extrude6_piece_2_2:
    add(cut_extrude6_piece_2_1.part)

    add(body_3_2.part)  # Boss-Extrude16 merges body 3 2
    add(boss_extrude16_tool1.solids().sort_by_distance((0, -72, 75))[0])


solid = Compound([cut_extrude6_piece_1.part, cut_extrude6_piece_2_2.part])
